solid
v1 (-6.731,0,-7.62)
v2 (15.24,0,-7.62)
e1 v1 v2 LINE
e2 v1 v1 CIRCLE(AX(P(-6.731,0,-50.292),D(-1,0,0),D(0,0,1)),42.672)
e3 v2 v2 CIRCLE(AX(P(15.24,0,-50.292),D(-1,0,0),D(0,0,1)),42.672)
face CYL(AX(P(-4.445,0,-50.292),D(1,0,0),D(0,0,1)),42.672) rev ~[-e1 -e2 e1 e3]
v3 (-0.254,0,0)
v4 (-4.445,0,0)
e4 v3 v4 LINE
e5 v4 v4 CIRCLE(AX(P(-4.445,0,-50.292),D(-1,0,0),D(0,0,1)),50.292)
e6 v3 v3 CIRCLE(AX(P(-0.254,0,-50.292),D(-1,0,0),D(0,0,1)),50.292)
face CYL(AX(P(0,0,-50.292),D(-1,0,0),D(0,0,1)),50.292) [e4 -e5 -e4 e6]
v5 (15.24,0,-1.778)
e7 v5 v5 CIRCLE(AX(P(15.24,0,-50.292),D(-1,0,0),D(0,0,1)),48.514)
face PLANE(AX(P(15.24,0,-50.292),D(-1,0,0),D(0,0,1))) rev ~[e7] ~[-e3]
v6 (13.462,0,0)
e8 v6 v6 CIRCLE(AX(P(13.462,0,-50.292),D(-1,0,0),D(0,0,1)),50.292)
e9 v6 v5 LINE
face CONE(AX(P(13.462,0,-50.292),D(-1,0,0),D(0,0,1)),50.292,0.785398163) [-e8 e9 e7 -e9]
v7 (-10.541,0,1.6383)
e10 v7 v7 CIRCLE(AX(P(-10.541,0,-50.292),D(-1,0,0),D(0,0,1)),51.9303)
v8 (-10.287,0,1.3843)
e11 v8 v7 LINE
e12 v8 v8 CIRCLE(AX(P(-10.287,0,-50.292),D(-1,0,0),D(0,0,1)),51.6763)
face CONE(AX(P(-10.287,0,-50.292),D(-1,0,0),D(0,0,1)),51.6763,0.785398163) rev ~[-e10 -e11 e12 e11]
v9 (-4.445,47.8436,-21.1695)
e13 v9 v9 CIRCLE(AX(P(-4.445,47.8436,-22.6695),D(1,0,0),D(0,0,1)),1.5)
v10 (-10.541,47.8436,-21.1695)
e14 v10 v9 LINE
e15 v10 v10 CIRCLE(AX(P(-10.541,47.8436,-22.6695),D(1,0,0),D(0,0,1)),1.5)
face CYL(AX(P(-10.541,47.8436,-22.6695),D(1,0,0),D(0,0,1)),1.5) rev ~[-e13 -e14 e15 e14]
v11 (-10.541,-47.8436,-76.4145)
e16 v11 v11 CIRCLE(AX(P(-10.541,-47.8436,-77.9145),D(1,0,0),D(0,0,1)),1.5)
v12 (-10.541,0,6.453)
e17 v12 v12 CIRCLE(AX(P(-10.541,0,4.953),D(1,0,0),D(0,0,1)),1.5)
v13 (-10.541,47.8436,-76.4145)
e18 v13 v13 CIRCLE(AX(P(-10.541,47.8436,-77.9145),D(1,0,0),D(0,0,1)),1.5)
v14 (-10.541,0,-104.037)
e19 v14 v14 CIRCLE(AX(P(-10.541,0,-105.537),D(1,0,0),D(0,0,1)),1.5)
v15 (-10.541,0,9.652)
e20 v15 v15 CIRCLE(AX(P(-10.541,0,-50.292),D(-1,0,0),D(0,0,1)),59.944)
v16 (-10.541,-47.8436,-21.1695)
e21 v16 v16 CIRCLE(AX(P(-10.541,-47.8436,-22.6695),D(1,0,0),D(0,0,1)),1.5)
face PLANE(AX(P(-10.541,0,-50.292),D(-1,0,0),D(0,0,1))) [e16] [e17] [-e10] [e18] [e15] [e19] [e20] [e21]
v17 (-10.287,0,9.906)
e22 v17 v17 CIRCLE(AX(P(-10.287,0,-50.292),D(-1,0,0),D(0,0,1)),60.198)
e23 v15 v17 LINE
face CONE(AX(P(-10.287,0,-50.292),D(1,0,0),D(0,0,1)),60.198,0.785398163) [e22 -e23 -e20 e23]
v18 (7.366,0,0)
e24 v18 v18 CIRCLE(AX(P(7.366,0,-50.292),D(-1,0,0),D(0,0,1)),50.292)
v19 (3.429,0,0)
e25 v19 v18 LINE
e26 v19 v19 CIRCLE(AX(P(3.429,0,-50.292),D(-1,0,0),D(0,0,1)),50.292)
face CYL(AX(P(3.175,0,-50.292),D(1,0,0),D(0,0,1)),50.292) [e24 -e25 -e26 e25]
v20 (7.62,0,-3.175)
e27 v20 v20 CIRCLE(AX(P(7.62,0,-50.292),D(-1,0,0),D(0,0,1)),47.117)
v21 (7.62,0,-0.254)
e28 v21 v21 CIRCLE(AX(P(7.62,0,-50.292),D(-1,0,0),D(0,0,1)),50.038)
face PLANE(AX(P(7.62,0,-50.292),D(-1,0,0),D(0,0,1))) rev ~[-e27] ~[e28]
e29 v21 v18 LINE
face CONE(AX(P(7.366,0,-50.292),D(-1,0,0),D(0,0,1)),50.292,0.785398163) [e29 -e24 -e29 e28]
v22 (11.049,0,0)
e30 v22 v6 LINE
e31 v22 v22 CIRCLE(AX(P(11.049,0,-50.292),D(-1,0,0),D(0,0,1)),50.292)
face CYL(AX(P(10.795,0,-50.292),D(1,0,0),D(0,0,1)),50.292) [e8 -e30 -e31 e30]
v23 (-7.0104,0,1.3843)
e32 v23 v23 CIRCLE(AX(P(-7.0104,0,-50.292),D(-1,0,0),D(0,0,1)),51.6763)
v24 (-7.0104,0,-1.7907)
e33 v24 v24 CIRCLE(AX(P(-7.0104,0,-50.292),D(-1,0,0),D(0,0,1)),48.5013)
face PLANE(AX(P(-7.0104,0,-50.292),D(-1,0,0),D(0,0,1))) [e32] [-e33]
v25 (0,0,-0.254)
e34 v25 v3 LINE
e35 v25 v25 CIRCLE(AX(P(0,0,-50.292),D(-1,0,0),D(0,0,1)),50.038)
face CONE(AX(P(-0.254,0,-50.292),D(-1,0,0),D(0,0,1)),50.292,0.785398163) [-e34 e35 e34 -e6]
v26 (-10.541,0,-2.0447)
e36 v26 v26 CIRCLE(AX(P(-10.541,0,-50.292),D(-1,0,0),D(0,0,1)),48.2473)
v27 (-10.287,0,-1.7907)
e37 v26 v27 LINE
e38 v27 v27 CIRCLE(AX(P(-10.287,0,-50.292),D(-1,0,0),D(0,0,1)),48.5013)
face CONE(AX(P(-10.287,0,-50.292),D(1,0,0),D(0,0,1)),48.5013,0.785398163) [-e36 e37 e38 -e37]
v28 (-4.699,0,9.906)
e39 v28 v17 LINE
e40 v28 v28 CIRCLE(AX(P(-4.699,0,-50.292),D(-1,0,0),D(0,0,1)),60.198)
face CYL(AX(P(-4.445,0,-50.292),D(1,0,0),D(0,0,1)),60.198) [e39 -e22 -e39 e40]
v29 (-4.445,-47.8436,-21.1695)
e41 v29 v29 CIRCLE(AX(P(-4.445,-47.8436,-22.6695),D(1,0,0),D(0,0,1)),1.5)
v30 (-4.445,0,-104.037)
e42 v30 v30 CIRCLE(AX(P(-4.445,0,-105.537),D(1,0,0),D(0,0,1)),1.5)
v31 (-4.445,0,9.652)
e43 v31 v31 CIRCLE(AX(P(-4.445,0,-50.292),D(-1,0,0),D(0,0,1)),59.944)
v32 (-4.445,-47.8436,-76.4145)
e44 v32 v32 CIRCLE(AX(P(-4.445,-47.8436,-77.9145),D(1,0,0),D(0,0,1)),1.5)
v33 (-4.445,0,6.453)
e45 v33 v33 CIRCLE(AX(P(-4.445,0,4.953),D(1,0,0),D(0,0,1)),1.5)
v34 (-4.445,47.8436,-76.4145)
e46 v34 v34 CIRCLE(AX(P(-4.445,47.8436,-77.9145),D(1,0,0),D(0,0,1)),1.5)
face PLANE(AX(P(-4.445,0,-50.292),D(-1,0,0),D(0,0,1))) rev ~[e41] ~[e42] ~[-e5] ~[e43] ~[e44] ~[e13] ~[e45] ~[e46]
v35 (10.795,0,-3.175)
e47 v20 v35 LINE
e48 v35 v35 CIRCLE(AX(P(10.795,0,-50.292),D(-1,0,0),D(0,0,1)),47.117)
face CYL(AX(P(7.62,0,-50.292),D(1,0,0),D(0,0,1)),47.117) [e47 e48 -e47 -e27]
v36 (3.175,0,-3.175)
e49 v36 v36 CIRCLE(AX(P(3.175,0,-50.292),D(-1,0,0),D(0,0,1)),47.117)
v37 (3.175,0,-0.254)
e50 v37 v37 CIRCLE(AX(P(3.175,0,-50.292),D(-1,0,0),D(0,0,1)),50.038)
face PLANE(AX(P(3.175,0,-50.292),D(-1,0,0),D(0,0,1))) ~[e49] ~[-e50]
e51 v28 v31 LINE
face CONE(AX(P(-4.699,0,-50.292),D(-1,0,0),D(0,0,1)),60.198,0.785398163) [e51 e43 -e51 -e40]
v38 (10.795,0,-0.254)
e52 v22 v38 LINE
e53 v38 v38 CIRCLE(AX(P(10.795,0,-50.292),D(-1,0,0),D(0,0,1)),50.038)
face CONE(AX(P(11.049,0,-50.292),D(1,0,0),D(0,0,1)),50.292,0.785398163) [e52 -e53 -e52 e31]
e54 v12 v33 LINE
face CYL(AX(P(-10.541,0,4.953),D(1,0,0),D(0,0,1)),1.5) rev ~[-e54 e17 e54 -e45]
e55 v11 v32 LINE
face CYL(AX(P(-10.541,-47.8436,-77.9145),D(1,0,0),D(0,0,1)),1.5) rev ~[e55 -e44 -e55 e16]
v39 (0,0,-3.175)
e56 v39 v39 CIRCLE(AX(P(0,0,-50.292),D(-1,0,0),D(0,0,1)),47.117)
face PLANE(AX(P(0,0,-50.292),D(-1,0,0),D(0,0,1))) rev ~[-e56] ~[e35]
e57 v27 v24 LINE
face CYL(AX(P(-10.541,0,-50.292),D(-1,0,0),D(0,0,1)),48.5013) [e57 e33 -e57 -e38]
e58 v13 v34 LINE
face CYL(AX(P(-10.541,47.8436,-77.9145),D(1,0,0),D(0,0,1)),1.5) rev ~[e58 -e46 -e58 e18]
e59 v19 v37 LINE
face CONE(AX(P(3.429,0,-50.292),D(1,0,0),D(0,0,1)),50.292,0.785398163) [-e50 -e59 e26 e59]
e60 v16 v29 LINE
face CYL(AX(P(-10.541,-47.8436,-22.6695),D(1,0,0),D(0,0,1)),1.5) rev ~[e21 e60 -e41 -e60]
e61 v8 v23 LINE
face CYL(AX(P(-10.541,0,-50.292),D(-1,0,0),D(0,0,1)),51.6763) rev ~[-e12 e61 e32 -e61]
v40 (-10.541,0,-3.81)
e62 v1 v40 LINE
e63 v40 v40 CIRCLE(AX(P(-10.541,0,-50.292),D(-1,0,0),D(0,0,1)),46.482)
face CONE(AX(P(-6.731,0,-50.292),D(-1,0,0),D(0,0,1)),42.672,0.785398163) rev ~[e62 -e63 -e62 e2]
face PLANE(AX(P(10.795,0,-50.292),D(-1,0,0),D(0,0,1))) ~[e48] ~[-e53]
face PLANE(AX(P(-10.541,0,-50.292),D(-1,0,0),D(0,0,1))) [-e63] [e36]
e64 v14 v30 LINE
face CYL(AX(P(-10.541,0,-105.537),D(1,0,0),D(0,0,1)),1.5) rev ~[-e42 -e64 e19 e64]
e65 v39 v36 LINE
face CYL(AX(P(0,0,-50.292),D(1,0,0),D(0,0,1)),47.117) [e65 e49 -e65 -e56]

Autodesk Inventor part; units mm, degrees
ref_plane "YZ Plane" through (0, 0, 0) normal (1, 0, 0) x (0, 1, 0)
ref_plane "XZ Plane" through (0, 0, 0) normal (0, 1, 0) x (-1, 0, 0)
ref_plane "XY Plane" through (0, 0, 0) normal (0, 0, 1) x (1, 0, 0)
sketch "Sketch1" plane through (0, 0, 0) normal (0, 1, 0) x (-1, 0, 0)
  line L0 (0, 0) -> (4.445, 0)
  line L1 (0, 0) -> (0, -3.175)
  line L2 (0, -3.175) -> (-3.175, -3.175)
  line L3 (-3.175, -3.175) -> (-3.175, 0)
  line L4 (-3.175, 0) -> (-7.62, 0)
  line L5 (-7.62, 0) -> (-7.62, -3.175)
  line L6 (-7.62, -3.175) -> (-10.795, -3.175)
  line L7 (-10.795, -3.175) -> (-10.795, 0)
  line L8 (-10.795, 0) -> (-15.24, 0)
  line L9 (-15.24, 0) -> (-15.24, -7.62)
  line L10 (-15.24, -7.62) -> (4.445, -7.62)
  line L11 (4.445, -7.62) -> (4.445, 0)
  line L12 (-15.24, 0) -> (-15.24, -50.292) construction
  line L13 (-15.24, -50.292) -> (-2.54, -50.292) construction
  dimension "d0" = 4.445
  dimension "d1" = 3.175
  dimension "d2" = 3.175
  dimension "d3" = 4.445
  dimension "d4" = 3.175
  dimension "d5" = 4.445
  dimension "d6" = 7.62
  dimension "d7" = 50.292
  dimension "d38" = 12.7
revolve "Revolution1" add sketch "Sketch1" angle 360 about axis through (15.24, 0, -50.292) along (-1, 0, 0)
sketch "Sketch2" plane through (-4.445, 0, -50.292) normal (-1, 0, 0) x (0, 0, 1)
  circle A0 centre (0, 0) radius 60.198
  circle A1 centre (0, 0) radius 42.672 projected
  dimension "d10" = 120.396
extrude "Extrusion1" add sketch "Sketch2" along normal blind 6.096
sketch "Sketch3" plane through (-10.541, 0, -50.292) normal (-1, 0, 0) x (0, 0, 1)
  circle A0 centre (0, 0) radius 48.5013
  circle A1 centre (0, 0) radius 51.6763
  circle A2 centre (0, 0) radius 42.672 construction
  dimension "d42" = 3.175
  dimension "d62" = 97.0026
extrude "Extrusion2" cut sketch "Sketch3" against normal blind 3.5306
chamfer "Chamfer1" distance 1.778 angle 45 1 edges at (15.24, 0, -100.584)
sketch "Sketch5" plane through (-10.541, 0, -50.292) normal (-1, 0, 0) x (0, 0, 1)
  circle A0 centre (0, 0) radius 55.245 construction
  circle A1 centre (0, 0) radius 42.672 projected
  circle A2 centre (0, 0) radius 48.5013 projected
  point P0 (-55.245, 0)
  point P1 (-27.6225, -47.8436)
  point P2 (27.6225, -47.8436)
  point P3 (55.245, 0)
  point P4 (27.6225, 47.8436)
  point P5 (-27.6225, 47.8436)
  dimension "d43" = 110.49
  dimension "d46" = 360
hole "Hole1" at (-10.541, 0, -105.537) at (-10.541, -47.8436, -77.9145) at (-10.541, -47.8436, -22.6695) at (-10.541, 0, 4.953) at (-10.541, 47.8436, -22.6695) at (-10.541, 47.8436, -77.9145) direction (1, 0, 0) diameter 3 end through all
chamfer "Chamfer2" distance 0.254 angle 45 8 edges at (0, 0, -100.584) (3.175, 0, -100.584) (7.62, 0, -100.584) (10.795, 0, -100.584) (-10.541, 0, -101.9683) (-10.541, 0, -98.7933) (-10.541, 0, -110.49) (-4.445, 0, -110.49)
sketch "Sketch8" plane through (-10.541, 0, -50.292) normal (-1, 0, 0) x (0, 0, 1)
  circle A0 centre (0, 0) radius 48.2473 projected
  point P0 (50.292, 0)
chamfer "Chamfer3" distance 3.81 angle 45 1 edges at (-10.541, 0, -92.964)
properties part number "Oring Fitting Dome V2"
